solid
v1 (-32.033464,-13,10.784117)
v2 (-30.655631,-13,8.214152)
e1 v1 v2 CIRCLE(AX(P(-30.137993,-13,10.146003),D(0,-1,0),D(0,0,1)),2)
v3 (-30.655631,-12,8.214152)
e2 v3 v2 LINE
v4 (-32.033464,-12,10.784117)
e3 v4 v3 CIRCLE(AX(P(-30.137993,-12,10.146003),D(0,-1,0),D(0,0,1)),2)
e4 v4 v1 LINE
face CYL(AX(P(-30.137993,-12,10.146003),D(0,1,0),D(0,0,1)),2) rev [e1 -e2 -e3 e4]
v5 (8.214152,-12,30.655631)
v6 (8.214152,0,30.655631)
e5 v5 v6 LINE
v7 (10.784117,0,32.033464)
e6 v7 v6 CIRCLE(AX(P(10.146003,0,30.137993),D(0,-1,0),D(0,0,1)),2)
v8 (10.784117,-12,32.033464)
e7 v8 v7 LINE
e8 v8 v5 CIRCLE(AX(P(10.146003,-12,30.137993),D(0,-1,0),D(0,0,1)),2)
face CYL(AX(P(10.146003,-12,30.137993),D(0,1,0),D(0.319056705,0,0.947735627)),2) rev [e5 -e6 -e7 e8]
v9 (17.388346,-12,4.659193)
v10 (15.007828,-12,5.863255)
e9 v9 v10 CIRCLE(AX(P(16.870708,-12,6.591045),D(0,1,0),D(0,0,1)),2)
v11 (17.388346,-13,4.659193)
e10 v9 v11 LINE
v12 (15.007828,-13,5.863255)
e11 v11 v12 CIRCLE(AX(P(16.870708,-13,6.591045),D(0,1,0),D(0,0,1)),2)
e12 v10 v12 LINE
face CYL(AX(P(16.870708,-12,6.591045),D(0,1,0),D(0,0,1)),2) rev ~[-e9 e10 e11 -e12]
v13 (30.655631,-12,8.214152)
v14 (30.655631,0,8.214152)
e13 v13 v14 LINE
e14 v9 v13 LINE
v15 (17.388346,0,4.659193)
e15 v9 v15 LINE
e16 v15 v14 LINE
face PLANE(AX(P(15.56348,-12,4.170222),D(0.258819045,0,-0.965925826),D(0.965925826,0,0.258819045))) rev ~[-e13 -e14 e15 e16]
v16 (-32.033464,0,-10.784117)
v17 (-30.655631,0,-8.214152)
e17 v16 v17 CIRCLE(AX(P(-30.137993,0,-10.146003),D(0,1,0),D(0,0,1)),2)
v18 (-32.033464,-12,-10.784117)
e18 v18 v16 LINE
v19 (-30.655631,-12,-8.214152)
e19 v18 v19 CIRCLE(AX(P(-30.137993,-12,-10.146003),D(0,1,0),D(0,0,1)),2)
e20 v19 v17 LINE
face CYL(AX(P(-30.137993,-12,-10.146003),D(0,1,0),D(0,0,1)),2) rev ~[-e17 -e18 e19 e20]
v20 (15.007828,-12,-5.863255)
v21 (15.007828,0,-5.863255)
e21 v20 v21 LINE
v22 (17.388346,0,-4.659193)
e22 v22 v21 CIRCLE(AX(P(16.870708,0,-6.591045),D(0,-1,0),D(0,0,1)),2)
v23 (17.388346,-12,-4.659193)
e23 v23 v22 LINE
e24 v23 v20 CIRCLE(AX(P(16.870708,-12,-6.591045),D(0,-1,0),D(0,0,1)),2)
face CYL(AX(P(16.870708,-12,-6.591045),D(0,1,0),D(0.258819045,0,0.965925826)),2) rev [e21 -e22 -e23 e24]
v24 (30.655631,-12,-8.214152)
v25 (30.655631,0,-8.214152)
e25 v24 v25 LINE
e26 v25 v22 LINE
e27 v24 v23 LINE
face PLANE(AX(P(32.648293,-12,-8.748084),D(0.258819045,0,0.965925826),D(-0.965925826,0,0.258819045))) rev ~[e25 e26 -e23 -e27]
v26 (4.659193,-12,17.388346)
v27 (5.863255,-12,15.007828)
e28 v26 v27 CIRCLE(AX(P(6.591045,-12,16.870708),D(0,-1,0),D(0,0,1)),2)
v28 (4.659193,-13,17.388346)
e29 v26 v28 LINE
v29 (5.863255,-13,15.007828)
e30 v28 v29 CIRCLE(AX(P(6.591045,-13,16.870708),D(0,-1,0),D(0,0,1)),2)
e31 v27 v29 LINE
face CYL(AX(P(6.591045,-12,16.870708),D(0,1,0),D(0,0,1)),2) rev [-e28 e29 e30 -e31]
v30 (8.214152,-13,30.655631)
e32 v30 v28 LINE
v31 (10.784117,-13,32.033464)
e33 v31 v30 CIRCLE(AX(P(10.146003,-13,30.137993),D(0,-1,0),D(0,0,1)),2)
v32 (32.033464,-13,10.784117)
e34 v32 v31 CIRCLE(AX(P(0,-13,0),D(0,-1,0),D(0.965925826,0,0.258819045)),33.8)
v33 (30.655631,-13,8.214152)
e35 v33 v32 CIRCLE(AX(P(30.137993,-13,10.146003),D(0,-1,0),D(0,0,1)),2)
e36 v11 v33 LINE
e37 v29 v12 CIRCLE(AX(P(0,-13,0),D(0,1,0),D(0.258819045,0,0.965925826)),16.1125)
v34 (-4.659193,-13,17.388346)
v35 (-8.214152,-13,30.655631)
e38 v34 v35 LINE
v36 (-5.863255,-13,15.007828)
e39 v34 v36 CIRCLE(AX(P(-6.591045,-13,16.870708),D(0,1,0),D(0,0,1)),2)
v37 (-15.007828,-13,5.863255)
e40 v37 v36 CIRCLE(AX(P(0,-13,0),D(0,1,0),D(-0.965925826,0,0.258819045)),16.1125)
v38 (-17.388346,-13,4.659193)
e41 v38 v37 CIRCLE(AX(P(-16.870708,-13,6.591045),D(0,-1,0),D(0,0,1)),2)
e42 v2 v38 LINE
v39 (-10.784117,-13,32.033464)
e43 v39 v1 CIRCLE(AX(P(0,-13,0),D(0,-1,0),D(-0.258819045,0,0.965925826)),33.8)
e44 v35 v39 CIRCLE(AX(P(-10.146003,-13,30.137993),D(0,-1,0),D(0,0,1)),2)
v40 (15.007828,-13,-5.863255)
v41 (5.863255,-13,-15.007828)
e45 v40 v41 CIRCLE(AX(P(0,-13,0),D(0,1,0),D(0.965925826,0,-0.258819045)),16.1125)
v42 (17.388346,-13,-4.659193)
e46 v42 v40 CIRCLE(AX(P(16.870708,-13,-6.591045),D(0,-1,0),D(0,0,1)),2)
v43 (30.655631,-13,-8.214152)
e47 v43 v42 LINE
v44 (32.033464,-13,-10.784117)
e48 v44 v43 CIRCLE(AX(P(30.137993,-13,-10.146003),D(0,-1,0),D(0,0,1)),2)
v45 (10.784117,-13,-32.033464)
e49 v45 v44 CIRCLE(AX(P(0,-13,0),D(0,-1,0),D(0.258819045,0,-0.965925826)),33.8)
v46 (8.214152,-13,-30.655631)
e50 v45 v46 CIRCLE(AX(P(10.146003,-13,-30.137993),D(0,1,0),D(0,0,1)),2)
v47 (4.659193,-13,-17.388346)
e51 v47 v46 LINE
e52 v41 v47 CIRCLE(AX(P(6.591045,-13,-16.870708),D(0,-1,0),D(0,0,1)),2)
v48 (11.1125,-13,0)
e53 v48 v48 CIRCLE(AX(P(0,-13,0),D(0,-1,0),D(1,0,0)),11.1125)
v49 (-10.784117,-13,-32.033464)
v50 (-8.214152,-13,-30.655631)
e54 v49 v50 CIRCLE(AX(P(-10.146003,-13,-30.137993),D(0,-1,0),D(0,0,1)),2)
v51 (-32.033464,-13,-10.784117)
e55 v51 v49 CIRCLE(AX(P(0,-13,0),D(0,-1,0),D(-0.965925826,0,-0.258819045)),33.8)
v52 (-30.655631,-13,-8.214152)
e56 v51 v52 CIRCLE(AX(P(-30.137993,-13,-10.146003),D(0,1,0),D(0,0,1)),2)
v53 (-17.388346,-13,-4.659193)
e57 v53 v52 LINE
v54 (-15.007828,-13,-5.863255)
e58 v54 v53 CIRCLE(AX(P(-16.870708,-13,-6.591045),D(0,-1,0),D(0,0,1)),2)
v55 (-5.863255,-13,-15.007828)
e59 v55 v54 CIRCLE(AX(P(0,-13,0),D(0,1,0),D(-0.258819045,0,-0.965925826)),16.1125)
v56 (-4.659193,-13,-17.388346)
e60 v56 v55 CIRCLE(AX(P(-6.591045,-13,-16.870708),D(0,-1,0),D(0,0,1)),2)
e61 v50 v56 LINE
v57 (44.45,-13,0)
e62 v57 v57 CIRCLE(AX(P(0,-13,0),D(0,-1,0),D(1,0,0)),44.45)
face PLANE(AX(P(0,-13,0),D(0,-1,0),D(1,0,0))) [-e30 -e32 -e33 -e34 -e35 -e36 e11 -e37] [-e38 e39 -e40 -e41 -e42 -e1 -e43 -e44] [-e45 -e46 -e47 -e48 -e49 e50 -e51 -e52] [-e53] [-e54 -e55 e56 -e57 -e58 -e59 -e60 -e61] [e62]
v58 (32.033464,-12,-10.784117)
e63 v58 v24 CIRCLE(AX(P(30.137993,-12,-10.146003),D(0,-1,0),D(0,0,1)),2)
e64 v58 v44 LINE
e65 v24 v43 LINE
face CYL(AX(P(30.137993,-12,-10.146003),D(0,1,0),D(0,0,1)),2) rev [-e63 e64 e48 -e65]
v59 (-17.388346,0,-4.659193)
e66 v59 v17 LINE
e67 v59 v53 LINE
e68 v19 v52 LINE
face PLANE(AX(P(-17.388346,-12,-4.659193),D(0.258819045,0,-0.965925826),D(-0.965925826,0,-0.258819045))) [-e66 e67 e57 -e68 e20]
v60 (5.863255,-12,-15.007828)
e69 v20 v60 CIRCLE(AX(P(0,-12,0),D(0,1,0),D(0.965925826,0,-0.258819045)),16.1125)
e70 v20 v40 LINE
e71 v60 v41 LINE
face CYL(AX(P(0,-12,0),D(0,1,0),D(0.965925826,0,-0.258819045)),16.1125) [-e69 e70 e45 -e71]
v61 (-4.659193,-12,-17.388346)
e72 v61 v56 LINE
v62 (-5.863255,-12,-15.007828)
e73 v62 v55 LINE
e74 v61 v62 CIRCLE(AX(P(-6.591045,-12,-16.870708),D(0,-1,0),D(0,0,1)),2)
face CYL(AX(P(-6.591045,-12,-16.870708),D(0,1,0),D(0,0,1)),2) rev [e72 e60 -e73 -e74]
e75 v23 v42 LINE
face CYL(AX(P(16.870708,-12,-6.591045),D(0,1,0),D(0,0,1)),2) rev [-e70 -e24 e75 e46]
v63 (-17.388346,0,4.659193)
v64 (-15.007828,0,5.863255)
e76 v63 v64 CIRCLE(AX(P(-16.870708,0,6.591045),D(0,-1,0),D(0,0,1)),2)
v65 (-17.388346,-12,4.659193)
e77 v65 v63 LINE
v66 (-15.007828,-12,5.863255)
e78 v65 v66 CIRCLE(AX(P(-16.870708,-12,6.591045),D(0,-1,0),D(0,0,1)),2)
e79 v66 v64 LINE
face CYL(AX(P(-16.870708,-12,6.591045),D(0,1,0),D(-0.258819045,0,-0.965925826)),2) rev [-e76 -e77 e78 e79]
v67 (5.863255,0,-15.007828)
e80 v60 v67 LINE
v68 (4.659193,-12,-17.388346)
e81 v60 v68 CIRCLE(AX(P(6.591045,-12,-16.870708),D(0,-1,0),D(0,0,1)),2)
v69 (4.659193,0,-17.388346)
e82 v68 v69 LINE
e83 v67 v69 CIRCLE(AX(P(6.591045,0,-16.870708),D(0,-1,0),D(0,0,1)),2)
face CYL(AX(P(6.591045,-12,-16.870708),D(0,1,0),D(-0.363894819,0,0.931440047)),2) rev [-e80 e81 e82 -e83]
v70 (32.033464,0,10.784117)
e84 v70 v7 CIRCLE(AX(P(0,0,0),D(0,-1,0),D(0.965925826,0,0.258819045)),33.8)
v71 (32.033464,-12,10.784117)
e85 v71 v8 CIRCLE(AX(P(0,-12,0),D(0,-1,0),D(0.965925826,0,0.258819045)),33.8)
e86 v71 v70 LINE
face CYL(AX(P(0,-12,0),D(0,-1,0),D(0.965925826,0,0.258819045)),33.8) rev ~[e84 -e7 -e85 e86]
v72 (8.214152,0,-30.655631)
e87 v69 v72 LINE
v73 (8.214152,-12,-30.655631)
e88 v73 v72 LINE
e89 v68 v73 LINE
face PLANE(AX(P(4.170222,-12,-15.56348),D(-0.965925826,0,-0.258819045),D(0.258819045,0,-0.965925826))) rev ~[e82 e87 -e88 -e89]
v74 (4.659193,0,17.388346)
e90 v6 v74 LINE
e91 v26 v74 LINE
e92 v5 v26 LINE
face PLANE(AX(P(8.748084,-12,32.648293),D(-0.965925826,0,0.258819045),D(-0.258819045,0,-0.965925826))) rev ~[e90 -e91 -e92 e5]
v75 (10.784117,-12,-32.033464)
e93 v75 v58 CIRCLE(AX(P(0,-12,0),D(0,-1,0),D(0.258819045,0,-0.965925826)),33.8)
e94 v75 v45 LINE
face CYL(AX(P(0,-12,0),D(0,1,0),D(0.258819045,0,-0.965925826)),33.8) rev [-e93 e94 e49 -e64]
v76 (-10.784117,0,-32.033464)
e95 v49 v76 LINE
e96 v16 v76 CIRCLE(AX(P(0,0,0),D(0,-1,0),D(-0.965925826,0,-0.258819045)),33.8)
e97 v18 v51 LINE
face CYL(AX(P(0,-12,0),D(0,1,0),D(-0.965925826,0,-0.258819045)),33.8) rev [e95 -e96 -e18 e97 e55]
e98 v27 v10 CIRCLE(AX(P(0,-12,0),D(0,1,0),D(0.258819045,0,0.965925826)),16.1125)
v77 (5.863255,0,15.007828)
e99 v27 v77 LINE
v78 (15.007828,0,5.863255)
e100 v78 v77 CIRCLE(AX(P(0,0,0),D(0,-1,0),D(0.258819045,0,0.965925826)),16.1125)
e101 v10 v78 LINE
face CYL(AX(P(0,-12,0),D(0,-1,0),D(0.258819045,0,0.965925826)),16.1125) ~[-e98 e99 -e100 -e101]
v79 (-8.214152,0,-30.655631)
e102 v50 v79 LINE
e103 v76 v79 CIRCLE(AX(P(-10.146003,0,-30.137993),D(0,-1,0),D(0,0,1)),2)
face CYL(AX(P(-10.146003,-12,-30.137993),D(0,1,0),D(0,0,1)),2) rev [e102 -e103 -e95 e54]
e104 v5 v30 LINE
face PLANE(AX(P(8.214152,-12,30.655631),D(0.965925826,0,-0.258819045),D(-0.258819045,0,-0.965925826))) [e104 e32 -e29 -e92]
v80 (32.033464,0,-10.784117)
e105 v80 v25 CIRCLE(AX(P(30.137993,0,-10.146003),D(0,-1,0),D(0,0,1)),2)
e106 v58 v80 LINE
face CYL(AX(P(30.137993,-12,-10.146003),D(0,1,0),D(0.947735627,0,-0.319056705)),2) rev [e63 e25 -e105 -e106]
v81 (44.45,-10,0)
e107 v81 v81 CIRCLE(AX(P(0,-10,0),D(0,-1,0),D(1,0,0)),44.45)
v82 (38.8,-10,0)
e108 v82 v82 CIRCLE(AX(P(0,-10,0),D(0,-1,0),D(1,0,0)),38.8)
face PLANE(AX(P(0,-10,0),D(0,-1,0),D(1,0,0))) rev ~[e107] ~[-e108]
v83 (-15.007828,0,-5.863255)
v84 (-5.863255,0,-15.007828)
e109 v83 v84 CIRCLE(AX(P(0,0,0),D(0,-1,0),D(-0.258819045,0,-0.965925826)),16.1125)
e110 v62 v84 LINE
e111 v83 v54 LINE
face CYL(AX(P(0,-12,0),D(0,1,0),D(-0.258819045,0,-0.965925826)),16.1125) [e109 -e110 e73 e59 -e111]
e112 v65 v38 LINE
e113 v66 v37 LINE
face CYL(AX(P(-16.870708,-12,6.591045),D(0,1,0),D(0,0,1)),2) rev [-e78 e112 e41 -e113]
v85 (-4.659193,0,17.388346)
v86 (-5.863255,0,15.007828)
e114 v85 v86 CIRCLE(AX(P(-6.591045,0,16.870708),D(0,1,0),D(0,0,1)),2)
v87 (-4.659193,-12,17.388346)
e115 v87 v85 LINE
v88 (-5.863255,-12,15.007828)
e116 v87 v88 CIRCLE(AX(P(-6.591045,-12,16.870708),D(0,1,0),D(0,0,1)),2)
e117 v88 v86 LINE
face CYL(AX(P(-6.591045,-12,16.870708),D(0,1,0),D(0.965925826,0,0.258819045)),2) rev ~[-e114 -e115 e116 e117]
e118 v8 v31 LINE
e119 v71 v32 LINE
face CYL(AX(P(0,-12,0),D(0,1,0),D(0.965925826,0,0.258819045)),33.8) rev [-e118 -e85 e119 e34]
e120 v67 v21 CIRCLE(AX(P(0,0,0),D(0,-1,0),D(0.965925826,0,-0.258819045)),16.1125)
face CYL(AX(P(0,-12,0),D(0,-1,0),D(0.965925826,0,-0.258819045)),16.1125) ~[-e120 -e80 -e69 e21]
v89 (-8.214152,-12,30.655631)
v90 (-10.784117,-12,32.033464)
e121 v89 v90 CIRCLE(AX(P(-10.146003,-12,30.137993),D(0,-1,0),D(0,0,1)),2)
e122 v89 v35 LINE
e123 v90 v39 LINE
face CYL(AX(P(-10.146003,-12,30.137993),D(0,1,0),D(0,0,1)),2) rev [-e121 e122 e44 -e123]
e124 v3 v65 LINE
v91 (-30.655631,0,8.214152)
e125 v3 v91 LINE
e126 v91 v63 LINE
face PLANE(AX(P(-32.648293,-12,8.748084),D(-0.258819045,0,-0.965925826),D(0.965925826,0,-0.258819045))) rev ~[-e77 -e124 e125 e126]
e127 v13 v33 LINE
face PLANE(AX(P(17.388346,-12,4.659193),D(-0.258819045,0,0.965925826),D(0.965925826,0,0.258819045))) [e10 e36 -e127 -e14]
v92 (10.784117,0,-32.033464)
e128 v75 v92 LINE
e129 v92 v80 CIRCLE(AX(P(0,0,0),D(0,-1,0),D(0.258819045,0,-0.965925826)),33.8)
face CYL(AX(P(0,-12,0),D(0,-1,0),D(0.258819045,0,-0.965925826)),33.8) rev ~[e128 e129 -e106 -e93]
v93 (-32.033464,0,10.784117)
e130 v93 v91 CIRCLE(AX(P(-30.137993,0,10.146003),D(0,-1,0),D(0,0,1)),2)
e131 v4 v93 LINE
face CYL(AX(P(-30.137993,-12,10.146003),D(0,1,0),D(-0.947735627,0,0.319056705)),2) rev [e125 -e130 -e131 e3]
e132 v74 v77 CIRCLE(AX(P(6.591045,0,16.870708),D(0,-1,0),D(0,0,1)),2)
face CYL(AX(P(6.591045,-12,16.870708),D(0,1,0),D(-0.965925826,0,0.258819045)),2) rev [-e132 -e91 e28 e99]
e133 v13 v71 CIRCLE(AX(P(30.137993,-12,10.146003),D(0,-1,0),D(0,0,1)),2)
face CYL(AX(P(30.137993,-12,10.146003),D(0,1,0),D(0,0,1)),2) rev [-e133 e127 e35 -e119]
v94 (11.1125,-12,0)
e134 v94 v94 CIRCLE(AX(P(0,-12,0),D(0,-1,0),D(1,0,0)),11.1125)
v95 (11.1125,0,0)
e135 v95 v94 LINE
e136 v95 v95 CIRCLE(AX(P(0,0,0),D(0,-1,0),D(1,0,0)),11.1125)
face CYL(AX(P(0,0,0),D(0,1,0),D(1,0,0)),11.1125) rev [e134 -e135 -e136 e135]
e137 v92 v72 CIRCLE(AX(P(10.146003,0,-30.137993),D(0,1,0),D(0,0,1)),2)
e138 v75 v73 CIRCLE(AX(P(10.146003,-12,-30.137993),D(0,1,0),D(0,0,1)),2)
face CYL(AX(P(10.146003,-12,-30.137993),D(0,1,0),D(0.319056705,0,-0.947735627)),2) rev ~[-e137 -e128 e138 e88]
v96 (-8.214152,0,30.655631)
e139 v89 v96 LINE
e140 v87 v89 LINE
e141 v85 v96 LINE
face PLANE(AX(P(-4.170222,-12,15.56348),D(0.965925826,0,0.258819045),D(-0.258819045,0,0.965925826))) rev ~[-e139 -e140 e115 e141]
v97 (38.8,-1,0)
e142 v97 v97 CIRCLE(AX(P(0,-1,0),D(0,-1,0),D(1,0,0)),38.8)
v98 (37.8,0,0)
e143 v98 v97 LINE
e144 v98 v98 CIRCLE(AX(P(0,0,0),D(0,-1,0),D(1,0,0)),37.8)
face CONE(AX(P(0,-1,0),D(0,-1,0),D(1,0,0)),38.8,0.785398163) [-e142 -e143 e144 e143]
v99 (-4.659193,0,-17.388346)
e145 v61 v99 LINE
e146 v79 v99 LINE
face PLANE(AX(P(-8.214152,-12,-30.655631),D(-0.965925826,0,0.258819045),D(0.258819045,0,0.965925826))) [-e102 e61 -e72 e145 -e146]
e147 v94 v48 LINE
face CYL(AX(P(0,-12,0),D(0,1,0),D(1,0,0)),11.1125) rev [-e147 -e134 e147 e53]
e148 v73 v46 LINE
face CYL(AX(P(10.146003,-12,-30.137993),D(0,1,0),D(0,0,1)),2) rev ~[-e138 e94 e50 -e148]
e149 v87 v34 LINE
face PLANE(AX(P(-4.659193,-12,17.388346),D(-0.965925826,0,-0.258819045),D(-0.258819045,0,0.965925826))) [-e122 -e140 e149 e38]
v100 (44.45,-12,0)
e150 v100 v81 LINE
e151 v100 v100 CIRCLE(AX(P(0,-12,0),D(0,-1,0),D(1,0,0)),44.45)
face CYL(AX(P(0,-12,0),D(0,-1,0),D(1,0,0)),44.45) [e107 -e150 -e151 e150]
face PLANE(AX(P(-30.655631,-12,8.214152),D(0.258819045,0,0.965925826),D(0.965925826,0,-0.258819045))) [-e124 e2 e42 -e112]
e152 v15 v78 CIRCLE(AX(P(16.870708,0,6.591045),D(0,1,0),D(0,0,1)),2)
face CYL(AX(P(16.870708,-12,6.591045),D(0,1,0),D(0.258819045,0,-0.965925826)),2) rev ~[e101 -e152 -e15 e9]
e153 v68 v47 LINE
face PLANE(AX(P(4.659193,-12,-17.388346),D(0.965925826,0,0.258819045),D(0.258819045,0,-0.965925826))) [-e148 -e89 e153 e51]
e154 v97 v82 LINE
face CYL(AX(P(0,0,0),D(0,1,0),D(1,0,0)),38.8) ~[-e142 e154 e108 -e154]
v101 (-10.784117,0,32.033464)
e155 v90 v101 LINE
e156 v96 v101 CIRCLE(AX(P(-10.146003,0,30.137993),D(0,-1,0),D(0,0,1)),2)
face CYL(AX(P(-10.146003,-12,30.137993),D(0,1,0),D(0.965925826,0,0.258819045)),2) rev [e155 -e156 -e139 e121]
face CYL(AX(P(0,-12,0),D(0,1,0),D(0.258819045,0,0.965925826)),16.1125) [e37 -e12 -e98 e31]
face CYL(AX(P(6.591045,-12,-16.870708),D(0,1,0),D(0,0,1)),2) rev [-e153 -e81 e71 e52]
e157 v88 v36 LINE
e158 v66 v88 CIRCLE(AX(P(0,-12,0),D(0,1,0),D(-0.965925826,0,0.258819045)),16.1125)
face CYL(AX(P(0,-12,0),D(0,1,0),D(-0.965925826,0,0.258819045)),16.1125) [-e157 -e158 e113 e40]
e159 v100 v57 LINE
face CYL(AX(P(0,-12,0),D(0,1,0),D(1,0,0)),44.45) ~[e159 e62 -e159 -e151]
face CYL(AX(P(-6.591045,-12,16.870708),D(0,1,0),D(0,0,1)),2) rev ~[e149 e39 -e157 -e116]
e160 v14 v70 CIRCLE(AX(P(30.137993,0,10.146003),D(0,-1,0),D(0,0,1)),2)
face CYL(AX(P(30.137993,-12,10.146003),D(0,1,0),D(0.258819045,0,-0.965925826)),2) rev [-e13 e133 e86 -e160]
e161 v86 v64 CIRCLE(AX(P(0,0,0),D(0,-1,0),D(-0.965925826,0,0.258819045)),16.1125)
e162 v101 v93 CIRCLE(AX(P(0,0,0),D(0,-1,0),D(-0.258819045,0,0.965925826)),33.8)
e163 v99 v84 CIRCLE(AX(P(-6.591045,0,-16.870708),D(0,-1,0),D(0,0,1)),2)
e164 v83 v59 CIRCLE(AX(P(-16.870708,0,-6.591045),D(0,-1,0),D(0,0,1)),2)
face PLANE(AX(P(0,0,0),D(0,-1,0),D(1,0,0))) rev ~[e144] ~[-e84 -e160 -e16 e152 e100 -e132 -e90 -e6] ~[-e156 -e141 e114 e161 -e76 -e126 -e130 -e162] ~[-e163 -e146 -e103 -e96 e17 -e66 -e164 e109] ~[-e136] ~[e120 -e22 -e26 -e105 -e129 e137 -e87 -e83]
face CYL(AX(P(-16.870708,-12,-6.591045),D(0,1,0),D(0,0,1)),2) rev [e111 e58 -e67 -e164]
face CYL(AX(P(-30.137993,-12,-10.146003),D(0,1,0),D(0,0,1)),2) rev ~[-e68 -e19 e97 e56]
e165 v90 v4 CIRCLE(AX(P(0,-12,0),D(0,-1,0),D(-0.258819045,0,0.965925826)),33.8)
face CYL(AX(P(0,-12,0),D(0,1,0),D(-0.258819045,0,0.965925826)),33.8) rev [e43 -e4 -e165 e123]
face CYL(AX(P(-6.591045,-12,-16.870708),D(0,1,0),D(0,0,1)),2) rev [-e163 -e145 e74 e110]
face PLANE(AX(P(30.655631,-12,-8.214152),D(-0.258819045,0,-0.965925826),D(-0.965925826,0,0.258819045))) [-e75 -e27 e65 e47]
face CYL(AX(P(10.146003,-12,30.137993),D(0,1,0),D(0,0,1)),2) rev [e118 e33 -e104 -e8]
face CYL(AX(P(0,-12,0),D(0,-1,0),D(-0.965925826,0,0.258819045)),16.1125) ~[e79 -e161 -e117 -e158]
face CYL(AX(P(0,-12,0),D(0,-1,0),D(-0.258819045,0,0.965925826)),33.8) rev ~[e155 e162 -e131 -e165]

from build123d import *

# Parameters (mm, degrees)
F0_R     = 38.8
F0_R_2   = 11.1125
F1_DEPTH = 12
F2_R     = 44.45
F2_R_2   = 38.8
F3_DEPTH = 2
F6_DEPTH = 25
F7_R     = 2
F8_SIZE  = 1
F9_DEPTH = 1


with BuildPart() as f1:
    # F0 (on Front) → F1 (new body)
    with BuildSketch(Plane.XZ):
        Circle(F0_R)
        Circle(F0_R_2, mode=Mode.SUBTRACT)
    extrude(amount=F1_DEPTH)

    # F2 (on face) → F3 (join)
    with BuildSketch(Plane.XZ.offset(12)):
        Circle(F2_R)
        Circle(F2_R_2, mode=Mode.SUBTRACT)
    extrude(amount=-F3_DEPTH)

    # F5 (on face) → F6 (cut)
    with BuildSketch(Plane.XZ.offset(12)):
        with BuildLine():
            ThreePointArc((8.7480837245, -32.6482929286), (23.9002092041, -23.9002092041), (32.6482929286, -8.7480837245))
            Line((32.6482929286, -8.7480837245), (15.5634798761, -4.1702218642))
            ThreePointArc((15.5634798761, -4.1702218642), (11.3932580119, -11.3932580119), (4.1702218642, -15.5634798761))
            Line((4.1702218642, -15.5634798761), (8.7480837245, -32.6482929286))
        make_face()
        with BuildLine():
            ThreePointArc((-32.6482929286, -8.7480837245), (-23.9002092041, -23.9002092041), (-8.7480837245, -32.6482929286))
            Line((-8.7480837245, -32.6482929286), (-4.1702218642, -15.5634798761))
            ThreePointArc((-4.1702218642, -15.5634798761), (-11.3932580119, -11.3932580119), (-15.5634798761, -4.1702218642))
            Line((-15.5634798761, -4.1702218642), (-32.6482929286, -8.7480837245))
        make_face()
        with BuildLine():
            Line((-4.1702218642, 15.5634798761), (-8.7480837245, 32.6482929286))
            ThreePointArc((-8.7480837245, 32.6482929286), (-23.9002092041, 23.9002092041), (-32.6482929286, 8.7480837245))
            Line((-32.6482929286, 8.7480837245), (-15.5634798761, 4.1702218642))
            ThreePointArc((-15.5634798761, 4.1702218642), (-11.3932580119, 11.3932580119), (-4.1702218642, 15.5634798761))
        make_face()
        with BuildLine():
            Line((15.5634798761, 4.1702218642), (32.6482929286, 8.7480837245))
            ThreePointArc((32.6482929286, 8.7480837245), (23.9002092041, 23.9002092041), (8.7480837245, 32.6482929286))
            Line((8.7480837245, 32.6482929286), (4.1702218642, 15.5634798761))
            ThreePointArc((4.1702218642, 15.5634798761), (11.3932580119, 11.3932580119), (15.5634798761, 4.1702218642))
        make_face()
    extrude(amount=-F6_DEPTH, mode=Mode.SUBTRACT)

    # F7
    f7_edges = [f1.edges().sort_by_distance(p)[0] for p in [
        (-8.748084, -6, -32.648293),
        (-4.170222, -6, -15.56348),
        (-15.56348, -6, -4.170222),
        (-32.648293, -6, -8.748084),
        (4.170222, -6, -15.56348),
        (8.748084, -6, -32.648293),
        (15.56348, -6, -4.170222),
        (32.648293, -6, -8.748084),
        (8.748084, -6, 32.648293),
        (32.648293, -6, 8.748084),
        (15.56348, -6, 4.170222),
        (4.170222, -6, 15.56348),
        (-4.170222, -6, 15.56348),
        (-15.56348, -6, 4.170222),
        (-8.748084, -6, 32.648293),
        (-32.648293, -6, 8.748084),
    ]]
    fillet(f7_edges, radius=F7_R)

    # F8
    f8_edges = [f1.edges().sort_by_distance(p)[0] for p in [
        (-38.8, 0, 0),
    ]]
    chamfer(f8_edges, length=F8_SIZE)

    # F9 (add): a face of the model
    f9_faces = [f1.faces().sort_by_distance(p)[0] for p in [
        (-10.5042580119, -12, -10.5042580119),
    ]]
    extrude(f9_faces, amount=F9_DEPTH)


solid = f1.part
